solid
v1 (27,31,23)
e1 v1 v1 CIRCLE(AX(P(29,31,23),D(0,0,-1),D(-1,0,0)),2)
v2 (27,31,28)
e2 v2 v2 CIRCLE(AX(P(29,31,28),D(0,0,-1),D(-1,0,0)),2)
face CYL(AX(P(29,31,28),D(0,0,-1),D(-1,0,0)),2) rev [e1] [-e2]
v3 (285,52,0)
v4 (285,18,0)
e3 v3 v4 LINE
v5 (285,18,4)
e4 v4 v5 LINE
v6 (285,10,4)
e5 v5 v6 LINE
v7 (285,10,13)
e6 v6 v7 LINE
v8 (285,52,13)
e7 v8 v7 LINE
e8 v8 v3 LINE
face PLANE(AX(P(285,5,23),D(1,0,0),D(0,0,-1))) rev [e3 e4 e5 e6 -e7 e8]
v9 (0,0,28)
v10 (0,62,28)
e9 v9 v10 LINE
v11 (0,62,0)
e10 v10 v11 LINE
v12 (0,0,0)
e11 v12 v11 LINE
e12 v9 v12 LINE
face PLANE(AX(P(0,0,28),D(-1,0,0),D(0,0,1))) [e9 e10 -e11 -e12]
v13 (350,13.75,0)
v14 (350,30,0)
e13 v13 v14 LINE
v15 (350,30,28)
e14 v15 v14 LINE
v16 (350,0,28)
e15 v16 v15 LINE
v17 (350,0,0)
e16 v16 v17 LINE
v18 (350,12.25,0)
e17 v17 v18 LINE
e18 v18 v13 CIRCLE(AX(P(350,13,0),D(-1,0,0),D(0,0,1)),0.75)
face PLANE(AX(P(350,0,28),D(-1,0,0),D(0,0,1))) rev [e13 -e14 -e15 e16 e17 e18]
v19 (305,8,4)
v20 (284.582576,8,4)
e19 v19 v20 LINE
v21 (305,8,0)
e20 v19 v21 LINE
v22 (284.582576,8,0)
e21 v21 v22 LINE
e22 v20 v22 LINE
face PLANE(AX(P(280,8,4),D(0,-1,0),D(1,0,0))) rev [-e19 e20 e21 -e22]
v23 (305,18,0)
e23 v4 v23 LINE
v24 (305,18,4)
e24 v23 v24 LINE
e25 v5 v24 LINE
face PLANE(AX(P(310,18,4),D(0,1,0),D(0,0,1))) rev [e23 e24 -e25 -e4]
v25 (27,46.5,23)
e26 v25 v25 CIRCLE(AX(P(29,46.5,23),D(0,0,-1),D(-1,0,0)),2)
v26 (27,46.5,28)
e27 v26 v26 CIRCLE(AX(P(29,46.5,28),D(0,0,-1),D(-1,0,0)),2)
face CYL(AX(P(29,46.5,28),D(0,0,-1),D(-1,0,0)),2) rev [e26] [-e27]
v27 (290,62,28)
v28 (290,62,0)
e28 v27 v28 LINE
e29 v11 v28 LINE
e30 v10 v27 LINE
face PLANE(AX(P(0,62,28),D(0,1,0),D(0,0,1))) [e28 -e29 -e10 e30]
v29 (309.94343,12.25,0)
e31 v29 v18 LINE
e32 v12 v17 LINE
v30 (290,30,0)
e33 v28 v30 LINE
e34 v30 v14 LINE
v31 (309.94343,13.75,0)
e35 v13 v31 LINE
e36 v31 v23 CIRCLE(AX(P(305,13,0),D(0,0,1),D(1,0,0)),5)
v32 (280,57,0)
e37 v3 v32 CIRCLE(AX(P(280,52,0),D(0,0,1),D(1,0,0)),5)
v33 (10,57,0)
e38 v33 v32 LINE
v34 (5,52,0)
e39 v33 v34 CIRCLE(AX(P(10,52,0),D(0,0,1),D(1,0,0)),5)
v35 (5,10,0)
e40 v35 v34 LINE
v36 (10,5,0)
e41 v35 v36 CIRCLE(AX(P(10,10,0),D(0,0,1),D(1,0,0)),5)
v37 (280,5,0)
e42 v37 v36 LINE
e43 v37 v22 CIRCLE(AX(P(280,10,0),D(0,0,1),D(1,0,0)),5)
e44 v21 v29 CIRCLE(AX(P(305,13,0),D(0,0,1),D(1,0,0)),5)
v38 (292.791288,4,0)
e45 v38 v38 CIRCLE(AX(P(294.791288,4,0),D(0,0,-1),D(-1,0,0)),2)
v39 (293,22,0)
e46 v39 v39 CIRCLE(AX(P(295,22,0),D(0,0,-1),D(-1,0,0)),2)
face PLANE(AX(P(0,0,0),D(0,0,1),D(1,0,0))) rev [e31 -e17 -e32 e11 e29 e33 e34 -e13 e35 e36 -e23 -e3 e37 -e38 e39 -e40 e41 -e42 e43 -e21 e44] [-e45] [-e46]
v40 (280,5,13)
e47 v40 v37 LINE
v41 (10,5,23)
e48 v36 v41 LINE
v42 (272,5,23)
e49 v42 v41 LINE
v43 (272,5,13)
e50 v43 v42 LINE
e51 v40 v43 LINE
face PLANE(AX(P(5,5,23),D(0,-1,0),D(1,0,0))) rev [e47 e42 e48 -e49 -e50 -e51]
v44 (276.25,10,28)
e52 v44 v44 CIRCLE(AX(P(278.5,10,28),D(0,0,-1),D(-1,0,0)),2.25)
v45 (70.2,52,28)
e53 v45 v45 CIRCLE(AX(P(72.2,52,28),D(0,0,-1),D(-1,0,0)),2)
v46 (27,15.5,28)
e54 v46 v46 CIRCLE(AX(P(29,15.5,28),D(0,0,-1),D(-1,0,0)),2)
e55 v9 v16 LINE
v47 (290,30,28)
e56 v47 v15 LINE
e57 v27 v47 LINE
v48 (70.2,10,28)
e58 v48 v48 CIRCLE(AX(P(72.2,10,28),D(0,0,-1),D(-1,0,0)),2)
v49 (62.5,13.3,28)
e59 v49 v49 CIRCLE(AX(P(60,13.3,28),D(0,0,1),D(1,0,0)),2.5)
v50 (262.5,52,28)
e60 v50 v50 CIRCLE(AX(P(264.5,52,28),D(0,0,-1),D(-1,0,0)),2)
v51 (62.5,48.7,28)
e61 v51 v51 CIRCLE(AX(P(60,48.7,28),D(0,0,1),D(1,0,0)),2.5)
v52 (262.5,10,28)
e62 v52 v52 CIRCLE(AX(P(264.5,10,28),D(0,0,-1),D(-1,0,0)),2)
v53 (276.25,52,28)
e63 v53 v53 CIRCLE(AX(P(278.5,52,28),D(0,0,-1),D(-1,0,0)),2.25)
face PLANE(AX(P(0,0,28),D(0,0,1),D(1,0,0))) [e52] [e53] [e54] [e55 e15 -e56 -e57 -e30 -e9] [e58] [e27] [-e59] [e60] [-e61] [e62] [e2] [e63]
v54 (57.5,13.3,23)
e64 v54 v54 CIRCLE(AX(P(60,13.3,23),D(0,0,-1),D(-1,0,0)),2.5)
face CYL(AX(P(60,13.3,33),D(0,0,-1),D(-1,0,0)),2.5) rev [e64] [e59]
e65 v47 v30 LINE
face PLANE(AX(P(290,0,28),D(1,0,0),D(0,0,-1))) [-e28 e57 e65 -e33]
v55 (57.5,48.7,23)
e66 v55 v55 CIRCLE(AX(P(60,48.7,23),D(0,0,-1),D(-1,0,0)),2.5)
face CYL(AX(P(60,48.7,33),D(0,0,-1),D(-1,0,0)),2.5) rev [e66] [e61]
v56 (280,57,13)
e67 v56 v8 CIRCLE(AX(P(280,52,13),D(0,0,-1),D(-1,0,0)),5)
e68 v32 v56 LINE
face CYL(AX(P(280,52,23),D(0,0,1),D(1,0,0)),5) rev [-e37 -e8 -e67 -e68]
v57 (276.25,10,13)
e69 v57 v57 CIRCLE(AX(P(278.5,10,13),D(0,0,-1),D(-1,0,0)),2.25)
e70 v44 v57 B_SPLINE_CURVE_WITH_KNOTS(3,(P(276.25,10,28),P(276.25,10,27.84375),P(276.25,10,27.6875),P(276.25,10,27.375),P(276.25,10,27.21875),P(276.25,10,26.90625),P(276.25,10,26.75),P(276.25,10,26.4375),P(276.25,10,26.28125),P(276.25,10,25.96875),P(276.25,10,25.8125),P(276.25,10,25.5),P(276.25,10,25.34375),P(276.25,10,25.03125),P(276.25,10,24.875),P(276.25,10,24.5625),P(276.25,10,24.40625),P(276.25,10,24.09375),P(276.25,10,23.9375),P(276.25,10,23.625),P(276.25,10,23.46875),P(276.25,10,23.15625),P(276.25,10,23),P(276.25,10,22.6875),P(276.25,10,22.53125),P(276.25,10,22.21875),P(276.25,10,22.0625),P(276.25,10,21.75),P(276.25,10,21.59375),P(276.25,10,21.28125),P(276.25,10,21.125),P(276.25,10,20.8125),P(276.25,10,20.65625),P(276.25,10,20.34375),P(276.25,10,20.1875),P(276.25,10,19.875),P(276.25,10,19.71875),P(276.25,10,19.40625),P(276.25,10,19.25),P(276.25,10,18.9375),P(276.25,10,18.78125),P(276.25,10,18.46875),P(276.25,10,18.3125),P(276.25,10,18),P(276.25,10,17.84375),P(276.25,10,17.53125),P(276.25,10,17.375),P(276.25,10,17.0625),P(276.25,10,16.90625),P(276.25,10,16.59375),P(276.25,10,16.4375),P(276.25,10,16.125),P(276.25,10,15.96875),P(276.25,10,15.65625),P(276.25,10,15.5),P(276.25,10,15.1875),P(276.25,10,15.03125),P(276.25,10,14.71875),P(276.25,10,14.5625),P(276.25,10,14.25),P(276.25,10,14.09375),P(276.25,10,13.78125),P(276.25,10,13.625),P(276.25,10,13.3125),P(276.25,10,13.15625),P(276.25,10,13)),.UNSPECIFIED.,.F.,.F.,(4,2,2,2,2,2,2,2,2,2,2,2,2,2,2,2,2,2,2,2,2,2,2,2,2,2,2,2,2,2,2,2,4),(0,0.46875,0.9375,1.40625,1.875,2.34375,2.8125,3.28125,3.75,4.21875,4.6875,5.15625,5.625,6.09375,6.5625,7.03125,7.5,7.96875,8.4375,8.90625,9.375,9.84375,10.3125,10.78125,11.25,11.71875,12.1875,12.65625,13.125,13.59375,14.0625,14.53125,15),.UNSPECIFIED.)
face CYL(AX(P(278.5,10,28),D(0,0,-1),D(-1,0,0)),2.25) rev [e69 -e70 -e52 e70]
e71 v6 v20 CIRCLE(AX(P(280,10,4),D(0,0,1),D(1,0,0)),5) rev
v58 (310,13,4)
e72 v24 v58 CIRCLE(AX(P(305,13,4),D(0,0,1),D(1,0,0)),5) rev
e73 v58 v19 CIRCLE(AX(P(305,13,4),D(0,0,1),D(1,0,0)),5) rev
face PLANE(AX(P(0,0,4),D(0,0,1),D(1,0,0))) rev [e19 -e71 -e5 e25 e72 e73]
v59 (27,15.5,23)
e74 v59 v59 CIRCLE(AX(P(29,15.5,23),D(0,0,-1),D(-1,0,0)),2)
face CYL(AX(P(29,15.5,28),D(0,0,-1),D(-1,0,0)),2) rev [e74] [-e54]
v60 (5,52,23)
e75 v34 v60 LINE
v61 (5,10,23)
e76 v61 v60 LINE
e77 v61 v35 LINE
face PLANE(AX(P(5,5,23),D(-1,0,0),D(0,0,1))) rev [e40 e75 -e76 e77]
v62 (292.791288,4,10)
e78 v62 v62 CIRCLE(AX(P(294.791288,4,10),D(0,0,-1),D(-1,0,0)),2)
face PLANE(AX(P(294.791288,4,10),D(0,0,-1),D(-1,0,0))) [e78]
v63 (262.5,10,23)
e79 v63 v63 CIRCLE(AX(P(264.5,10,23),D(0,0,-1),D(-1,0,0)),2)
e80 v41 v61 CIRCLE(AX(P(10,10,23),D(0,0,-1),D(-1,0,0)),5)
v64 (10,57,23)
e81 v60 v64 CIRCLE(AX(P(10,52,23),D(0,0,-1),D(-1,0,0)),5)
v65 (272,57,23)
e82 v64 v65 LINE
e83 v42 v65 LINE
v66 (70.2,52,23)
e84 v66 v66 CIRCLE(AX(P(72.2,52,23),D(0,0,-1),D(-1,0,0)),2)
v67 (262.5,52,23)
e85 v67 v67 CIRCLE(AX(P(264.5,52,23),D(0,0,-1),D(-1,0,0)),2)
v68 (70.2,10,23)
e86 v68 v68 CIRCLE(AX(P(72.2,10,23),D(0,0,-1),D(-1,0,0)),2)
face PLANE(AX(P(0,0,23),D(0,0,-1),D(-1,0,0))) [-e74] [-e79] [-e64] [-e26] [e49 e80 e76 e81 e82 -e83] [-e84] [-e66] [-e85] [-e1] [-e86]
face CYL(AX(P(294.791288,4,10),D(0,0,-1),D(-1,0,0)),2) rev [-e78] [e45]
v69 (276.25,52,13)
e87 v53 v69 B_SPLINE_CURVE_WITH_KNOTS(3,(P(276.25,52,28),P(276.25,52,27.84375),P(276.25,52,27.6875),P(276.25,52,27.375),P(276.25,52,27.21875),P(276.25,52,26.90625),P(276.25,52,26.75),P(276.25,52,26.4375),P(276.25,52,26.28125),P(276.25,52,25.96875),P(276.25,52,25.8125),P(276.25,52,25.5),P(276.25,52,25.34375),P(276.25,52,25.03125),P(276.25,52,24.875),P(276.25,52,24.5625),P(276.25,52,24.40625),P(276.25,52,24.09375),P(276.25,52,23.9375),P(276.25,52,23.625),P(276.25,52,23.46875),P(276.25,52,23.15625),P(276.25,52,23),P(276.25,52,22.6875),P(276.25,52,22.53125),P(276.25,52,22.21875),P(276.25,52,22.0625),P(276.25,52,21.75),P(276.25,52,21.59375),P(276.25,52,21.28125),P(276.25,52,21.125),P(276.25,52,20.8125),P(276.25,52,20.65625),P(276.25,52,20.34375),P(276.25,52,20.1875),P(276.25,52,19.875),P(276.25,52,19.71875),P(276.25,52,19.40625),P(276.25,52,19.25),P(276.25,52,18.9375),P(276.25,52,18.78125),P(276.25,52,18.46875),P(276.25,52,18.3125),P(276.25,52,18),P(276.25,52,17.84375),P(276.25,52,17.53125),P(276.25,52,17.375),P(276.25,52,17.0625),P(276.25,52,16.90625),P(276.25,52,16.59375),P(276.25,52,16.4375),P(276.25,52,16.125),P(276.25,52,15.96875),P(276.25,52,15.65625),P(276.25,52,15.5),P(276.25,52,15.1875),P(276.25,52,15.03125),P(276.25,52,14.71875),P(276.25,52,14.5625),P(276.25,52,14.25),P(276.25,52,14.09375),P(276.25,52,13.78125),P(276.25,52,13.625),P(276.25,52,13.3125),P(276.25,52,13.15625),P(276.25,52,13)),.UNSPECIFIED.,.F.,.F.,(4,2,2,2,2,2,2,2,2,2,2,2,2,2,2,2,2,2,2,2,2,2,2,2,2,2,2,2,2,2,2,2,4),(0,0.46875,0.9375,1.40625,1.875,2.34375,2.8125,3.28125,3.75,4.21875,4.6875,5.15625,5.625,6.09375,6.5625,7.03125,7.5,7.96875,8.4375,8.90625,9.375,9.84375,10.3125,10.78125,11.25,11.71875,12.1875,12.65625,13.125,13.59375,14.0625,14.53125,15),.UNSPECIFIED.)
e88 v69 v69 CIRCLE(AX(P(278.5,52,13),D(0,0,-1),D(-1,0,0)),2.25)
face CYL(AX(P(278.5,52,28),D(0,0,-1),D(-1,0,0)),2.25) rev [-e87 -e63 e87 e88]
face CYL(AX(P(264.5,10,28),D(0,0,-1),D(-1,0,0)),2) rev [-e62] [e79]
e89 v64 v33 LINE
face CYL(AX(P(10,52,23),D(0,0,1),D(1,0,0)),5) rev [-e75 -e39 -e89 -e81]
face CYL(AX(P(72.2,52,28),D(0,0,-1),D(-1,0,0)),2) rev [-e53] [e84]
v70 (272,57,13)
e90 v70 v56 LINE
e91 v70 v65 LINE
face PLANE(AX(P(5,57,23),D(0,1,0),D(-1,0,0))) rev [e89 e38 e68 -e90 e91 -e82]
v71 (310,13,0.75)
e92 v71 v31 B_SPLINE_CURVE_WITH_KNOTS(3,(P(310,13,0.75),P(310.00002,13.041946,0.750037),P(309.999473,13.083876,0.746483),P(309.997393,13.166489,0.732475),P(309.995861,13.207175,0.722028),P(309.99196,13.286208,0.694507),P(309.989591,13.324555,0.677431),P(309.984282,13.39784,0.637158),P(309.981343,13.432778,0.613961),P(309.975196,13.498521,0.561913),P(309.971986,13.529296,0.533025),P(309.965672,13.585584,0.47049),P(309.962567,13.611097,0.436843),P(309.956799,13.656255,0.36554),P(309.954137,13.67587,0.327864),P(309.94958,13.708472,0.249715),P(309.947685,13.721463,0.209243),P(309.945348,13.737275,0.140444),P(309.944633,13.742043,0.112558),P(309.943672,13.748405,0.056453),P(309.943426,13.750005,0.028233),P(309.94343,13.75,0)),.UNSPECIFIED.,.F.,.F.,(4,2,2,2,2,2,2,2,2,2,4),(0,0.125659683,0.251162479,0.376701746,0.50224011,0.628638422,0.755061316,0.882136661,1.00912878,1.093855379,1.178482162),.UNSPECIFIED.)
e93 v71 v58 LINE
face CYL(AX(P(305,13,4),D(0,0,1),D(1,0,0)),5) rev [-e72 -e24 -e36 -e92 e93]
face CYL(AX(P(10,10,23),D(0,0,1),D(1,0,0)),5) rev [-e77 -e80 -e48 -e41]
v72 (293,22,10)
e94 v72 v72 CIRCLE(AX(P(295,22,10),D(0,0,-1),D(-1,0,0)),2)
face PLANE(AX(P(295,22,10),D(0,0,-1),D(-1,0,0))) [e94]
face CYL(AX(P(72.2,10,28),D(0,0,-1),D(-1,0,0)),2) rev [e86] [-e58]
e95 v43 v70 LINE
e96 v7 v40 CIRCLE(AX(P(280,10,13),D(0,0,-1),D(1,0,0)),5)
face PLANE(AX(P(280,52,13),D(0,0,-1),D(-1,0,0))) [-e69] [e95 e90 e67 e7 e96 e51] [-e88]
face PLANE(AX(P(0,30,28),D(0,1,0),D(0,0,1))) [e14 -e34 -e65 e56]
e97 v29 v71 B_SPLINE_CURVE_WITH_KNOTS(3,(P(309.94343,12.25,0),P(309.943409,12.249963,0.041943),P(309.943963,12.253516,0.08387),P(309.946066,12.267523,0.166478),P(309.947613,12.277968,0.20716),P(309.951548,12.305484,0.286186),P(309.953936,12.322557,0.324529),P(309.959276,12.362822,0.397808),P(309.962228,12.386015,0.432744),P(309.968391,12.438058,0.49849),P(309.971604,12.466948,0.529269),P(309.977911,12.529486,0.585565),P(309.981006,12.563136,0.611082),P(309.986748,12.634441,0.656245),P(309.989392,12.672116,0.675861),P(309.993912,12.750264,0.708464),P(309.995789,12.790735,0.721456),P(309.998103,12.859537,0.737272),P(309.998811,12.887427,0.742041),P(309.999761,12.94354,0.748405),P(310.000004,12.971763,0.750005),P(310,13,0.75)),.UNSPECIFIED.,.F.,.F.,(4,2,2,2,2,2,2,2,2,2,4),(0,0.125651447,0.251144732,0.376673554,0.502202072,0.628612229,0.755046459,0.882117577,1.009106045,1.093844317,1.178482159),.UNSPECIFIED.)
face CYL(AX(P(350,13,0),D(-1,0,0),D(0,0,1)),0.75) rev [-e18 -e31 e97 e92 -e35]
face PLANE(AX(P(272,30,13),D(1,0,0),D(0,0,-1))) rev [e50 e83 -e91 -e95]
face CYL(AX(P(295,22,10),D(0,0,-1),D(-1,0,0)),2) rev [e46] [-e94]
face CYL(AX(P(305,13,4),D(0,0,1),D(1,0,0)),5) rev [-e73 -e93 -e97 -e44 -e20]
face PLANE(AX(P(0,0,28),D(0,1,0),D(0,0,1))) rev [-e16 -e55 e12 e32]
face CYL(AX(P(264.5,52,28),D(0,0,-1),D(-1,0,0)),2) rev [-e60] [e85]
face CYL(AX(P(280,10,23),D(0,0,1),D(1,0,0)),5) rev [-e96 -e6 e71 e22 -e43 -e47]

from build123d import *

# Parameters (mm, degrees)
RESSALTO_EXTRUS_O1_DEPTH = 28
ESBO_O2_W                = 280
ESBO_O2_H                = 52
CORTE_EXTRUS_O1_DEPTH    = 23
FILETE6_R                = 5
RESSALTO_EXTRUS_O2_DEPTH = 10
ESBO_O4_R                = 2
CORTE_EXTRUS_O3_DEPTH    = 357.192363759
ESBO_O5_R                = 2
CORTE_EXTRUS_O4_DEPTH    = 357.192363759
ESBO_O6_R                = 2.25
CORTE_EXTRUS_O5_DEPTH    = 356.76537212
ESBO_O7_R                = 2.5
CORTE_EXTRUS_O6_DEPTH    = 10
ESBO_O13_R               = 2
CORTE_EXTRUS_O12_DEPTH   = 357.192363759
ESBO_O15_W               = 30
ESBO_O15_H               = 10
CORTE_EXTRUS_O13_DEPTH   = 4
ESBO_O16_R               = 0.75
CORTE_EXTRUS_O14_DEPTH   = 318.376747731
FILETE7_R                = 5
ESBO_O17_R               = 2
CORTE_EXTRUS_O15_DEPTH   = 10


with BuildPart() as part:
    # Esboço1 → Ressalto-extrusão1 (new body)
    with BuildSketch(Plane.XY):
        Polygon((350, 30), (290, 30), (290, 62), (0, 62), (0, 0), (290, 0), (350, 0), align=None)
    extrude(amount=RESSALTO_EXTRUS_O1_DEPTH)

    # Esboço2 → Corte-extrusão1 (cut)
    with BuildSketch(Plane(origin=(0, 0, 0), x_dir=(-1, 0, 0), z_dir=(0, 0, -1))):
        with Locations((-145, 31)):
            Rectangle(ESBO_O2_W, ESBO_O2_H)
    extrude(amount=-CORTE_EXTRUS_O1_DEPTH, mode=Mode.SUBTRACT)

    # Filete6
    filete6_edges = [part.edges().sort_by_distance(p)[0] for p in [
        (285, 5, 11.5),
        (285, 57, 11.5),
        (5, 57, 11.5),
        (5, 5, 11.5),
    ]]
    fillet(filete6_edges, radius=FILETE6_R)

    # Esboço3 → Ressalto-extrusão2 (add)
    with BuildSketch(Plane(origin=(0, 0, 23), x_dir=(-1, 0, 0), z_dir=(0, 0, -1))):
        with BuildLine():
            Line((-272, 30), (-272, 57))
            Line((-272, 57), (-280, 57))
            ThreePointArc((-280, 57), (-283.535533906, 55.535533906), (-285, 52))
            Line((-285, 52), (-285, 10))
            ThreePointArc((-285, 10), (-283.535533906, 6.464466094), (-280, 5))
            Line((-280, 5), (-272, 5))
            Line((-272, 5), (-272, 30))
        make_face()
    extrude(amount=RESSALTO_EXTRUS_O2_DEPTH)

    # Esboço4 → Corte-extrusão3 (cut, through all)
    with BuildSketch(Plane(origin=(0, 0, 23), x_dir=(-1, 0, 0), z_dir=(0, 0, -1))):
        with Locations((-72.2, 10)):
            Circle(ESBO_O4_R)
        with Locations((-72.2, 52)):
            Circle(ESBO_O4_R)
    extrude(amount=-CORTE_EXTRUS_O3_DEPTH, mode=Mode.SUBTRACT)

    # Esboço5 → Corte-extrusão4 (cut, through all)
    with BuildSketch(Plane(origin=(0, 0, 23), x_dir=(-1, 0, 0), z_dir=(0, 0, -1))):
        with Locations((-264.5, 52)):
            Circle(ESBO_O5_R)
        with Locations((-264.5, 10)):
            Circle(ESBO_O5_R)
    extrude(amount=-CORTE_EXTRUS_O4_DEPTH, mode=Mode.SUBTRACT)

    # Esboço6 → Corte-extrusão5 (cut, through all)
    with BuildSketch(Plane(origin=(0, 0, 13), x_dir=(-1, 0, 0), z_dir=(0, 0, -1))):
        with Locations((-278.5, 10)):
            Circle(ESBO_O6_R)
        with Locations((-278.5, 52)):
            Circle(ESBO_O6_R)
    extrude(amount=-CORTE_EXTRUS_O5_DEPTH, mode=Mode.SUBTRACT)

    # Esboço7 → Corte-extrusão6 (cut)
    with BuildSketch(Plane(origin=(0, 0, 23), x_dir=(-1, 0, 0), z_dir=(0, 0, -1))):
        with Locations((-60, 48.7)):
            Circle(ESBO_O7_R)
        with Locations((-60, 13.3)):
            Circle(ESBO_O7_R)
    extrude(amount=-CORTE_EXTRUS_O6_DEPTH, mode=Mode.SUBTRACT)

    # Esboço13 → Corte-extrusão12 (cut, through all)
    with BuildSketch(Plane(origin=(0, 0, 23), x_dir=(-1, 0, 0), z_dir=(0, 0, -1))):
        with Locations((-29, 46.5)):
            Circle(ESBO_O13_R)
        with Locations((-29, 31)):
            Circle(ESBO_O13_R)
        with Locations((-29, 15.5)):
            Circle(ESBO_O13_R)
    extrude(amount=-CORTE_EXTRUS_O12_DEPTH, mode=Mode.SUBTRACT)

    # Esboço15 → Corte-extrusão13 (cut)
    with BuildSketch(Plane(origin=(0, 0, 0), x_dir=(-1, 0, 0), z_dir=(0, 0, -1))):
        with Locations((-295, 13)):
            Rectangle(ESBO_O15_W, ESBO_O15_H)
    extrude(amount=-CORTE_EXTRUS_O13_DEPTH, mode=Mode.SUBTRACT)

    # Esboço16 → Corte-extrusão14 (cut, through all)
    with BuildSketch(Plane.ZY.offset(-310)):
        with Locations((0, 13)):
            Circle(ESBO_O16_R)
    extrude(amount=-CORTE_EXTRUS_O14_DEPTH, mode=Mode.SUBTRACT)

    # Filete7
    # the kernel refuses this fillet: 5 mm, written as the material it adds along each edge
    with BuildSketch(Plane(origin=(310, 18, 0), x_dir=(-1, 0, 0), z_dir=(0, 0, 1))) as filete7_piece_1_section:
        with BuildLine():
            CenterArc((FILETE7_R, FILETE7_R), FILETE7_R, 180, 90)
            Line((0, FILETE7_R), (0, 0))
            Line((0, 0), (FILETE7_R, 0))
        make_face()
    filete7_piece_1 = extrude(amount=16.5, mode=Mode.PRIVATE)
    filete7_piece_1 = filete7_piece_1 - Plane(origin=(308.865698772, 13, 0), x_dir=(0, 0, 1), z_dir=(-1, 0, 0)) * Cylinder(0.75, 53, mode=Mode.PRIVATE)
    add(filete7_piece_1)
    with BuildSketch(Plane(origin=(310, 8, 0), x_dir=(-1, 0, 0), z_dir=(0, 0, 1))) as filete7_piece_2_section:
        with BuildLine():
            CenterArc((FILETE7_R, -FILETE7_R), FILETE7_R, 90, 90)
            Line((0, -FILETE7_R), (0, 0))
            Line((0, 0), (FILETE7_R, 0))
        make_face()
    filete7_piece_2 = extrude(amount=16.5, mode=Mode.PRIVATE)
    filete7_piece_2 = filete7_piece_2 - Plane(origin=(308.865698858, 13, 0), x_dir=(0, 0, 1), z_dir=(-1, 0, 0)) * Cylinder(0.75, 54, mode=Mode.PRIVATE)
    add(filete7_piece_2)

    # Esboço17 → Corte-extrusão15 (cut)
    with BuildSketch(Plane(origin=(0, 0, 0), x_dir=(-1, 0, 0), z_dir=(0, 0, -1))):
        with Locations((-294.791287847, 4)):
            Circle(ESBO_O17_R)
        with Locations((-295, 22)):
            Circle(ESBO_O17_R)
    extrude(amount=-CORTE_EXTRUS_O15_DEPTH, mode=Mode.SUBTRACT)


solid = part.part
